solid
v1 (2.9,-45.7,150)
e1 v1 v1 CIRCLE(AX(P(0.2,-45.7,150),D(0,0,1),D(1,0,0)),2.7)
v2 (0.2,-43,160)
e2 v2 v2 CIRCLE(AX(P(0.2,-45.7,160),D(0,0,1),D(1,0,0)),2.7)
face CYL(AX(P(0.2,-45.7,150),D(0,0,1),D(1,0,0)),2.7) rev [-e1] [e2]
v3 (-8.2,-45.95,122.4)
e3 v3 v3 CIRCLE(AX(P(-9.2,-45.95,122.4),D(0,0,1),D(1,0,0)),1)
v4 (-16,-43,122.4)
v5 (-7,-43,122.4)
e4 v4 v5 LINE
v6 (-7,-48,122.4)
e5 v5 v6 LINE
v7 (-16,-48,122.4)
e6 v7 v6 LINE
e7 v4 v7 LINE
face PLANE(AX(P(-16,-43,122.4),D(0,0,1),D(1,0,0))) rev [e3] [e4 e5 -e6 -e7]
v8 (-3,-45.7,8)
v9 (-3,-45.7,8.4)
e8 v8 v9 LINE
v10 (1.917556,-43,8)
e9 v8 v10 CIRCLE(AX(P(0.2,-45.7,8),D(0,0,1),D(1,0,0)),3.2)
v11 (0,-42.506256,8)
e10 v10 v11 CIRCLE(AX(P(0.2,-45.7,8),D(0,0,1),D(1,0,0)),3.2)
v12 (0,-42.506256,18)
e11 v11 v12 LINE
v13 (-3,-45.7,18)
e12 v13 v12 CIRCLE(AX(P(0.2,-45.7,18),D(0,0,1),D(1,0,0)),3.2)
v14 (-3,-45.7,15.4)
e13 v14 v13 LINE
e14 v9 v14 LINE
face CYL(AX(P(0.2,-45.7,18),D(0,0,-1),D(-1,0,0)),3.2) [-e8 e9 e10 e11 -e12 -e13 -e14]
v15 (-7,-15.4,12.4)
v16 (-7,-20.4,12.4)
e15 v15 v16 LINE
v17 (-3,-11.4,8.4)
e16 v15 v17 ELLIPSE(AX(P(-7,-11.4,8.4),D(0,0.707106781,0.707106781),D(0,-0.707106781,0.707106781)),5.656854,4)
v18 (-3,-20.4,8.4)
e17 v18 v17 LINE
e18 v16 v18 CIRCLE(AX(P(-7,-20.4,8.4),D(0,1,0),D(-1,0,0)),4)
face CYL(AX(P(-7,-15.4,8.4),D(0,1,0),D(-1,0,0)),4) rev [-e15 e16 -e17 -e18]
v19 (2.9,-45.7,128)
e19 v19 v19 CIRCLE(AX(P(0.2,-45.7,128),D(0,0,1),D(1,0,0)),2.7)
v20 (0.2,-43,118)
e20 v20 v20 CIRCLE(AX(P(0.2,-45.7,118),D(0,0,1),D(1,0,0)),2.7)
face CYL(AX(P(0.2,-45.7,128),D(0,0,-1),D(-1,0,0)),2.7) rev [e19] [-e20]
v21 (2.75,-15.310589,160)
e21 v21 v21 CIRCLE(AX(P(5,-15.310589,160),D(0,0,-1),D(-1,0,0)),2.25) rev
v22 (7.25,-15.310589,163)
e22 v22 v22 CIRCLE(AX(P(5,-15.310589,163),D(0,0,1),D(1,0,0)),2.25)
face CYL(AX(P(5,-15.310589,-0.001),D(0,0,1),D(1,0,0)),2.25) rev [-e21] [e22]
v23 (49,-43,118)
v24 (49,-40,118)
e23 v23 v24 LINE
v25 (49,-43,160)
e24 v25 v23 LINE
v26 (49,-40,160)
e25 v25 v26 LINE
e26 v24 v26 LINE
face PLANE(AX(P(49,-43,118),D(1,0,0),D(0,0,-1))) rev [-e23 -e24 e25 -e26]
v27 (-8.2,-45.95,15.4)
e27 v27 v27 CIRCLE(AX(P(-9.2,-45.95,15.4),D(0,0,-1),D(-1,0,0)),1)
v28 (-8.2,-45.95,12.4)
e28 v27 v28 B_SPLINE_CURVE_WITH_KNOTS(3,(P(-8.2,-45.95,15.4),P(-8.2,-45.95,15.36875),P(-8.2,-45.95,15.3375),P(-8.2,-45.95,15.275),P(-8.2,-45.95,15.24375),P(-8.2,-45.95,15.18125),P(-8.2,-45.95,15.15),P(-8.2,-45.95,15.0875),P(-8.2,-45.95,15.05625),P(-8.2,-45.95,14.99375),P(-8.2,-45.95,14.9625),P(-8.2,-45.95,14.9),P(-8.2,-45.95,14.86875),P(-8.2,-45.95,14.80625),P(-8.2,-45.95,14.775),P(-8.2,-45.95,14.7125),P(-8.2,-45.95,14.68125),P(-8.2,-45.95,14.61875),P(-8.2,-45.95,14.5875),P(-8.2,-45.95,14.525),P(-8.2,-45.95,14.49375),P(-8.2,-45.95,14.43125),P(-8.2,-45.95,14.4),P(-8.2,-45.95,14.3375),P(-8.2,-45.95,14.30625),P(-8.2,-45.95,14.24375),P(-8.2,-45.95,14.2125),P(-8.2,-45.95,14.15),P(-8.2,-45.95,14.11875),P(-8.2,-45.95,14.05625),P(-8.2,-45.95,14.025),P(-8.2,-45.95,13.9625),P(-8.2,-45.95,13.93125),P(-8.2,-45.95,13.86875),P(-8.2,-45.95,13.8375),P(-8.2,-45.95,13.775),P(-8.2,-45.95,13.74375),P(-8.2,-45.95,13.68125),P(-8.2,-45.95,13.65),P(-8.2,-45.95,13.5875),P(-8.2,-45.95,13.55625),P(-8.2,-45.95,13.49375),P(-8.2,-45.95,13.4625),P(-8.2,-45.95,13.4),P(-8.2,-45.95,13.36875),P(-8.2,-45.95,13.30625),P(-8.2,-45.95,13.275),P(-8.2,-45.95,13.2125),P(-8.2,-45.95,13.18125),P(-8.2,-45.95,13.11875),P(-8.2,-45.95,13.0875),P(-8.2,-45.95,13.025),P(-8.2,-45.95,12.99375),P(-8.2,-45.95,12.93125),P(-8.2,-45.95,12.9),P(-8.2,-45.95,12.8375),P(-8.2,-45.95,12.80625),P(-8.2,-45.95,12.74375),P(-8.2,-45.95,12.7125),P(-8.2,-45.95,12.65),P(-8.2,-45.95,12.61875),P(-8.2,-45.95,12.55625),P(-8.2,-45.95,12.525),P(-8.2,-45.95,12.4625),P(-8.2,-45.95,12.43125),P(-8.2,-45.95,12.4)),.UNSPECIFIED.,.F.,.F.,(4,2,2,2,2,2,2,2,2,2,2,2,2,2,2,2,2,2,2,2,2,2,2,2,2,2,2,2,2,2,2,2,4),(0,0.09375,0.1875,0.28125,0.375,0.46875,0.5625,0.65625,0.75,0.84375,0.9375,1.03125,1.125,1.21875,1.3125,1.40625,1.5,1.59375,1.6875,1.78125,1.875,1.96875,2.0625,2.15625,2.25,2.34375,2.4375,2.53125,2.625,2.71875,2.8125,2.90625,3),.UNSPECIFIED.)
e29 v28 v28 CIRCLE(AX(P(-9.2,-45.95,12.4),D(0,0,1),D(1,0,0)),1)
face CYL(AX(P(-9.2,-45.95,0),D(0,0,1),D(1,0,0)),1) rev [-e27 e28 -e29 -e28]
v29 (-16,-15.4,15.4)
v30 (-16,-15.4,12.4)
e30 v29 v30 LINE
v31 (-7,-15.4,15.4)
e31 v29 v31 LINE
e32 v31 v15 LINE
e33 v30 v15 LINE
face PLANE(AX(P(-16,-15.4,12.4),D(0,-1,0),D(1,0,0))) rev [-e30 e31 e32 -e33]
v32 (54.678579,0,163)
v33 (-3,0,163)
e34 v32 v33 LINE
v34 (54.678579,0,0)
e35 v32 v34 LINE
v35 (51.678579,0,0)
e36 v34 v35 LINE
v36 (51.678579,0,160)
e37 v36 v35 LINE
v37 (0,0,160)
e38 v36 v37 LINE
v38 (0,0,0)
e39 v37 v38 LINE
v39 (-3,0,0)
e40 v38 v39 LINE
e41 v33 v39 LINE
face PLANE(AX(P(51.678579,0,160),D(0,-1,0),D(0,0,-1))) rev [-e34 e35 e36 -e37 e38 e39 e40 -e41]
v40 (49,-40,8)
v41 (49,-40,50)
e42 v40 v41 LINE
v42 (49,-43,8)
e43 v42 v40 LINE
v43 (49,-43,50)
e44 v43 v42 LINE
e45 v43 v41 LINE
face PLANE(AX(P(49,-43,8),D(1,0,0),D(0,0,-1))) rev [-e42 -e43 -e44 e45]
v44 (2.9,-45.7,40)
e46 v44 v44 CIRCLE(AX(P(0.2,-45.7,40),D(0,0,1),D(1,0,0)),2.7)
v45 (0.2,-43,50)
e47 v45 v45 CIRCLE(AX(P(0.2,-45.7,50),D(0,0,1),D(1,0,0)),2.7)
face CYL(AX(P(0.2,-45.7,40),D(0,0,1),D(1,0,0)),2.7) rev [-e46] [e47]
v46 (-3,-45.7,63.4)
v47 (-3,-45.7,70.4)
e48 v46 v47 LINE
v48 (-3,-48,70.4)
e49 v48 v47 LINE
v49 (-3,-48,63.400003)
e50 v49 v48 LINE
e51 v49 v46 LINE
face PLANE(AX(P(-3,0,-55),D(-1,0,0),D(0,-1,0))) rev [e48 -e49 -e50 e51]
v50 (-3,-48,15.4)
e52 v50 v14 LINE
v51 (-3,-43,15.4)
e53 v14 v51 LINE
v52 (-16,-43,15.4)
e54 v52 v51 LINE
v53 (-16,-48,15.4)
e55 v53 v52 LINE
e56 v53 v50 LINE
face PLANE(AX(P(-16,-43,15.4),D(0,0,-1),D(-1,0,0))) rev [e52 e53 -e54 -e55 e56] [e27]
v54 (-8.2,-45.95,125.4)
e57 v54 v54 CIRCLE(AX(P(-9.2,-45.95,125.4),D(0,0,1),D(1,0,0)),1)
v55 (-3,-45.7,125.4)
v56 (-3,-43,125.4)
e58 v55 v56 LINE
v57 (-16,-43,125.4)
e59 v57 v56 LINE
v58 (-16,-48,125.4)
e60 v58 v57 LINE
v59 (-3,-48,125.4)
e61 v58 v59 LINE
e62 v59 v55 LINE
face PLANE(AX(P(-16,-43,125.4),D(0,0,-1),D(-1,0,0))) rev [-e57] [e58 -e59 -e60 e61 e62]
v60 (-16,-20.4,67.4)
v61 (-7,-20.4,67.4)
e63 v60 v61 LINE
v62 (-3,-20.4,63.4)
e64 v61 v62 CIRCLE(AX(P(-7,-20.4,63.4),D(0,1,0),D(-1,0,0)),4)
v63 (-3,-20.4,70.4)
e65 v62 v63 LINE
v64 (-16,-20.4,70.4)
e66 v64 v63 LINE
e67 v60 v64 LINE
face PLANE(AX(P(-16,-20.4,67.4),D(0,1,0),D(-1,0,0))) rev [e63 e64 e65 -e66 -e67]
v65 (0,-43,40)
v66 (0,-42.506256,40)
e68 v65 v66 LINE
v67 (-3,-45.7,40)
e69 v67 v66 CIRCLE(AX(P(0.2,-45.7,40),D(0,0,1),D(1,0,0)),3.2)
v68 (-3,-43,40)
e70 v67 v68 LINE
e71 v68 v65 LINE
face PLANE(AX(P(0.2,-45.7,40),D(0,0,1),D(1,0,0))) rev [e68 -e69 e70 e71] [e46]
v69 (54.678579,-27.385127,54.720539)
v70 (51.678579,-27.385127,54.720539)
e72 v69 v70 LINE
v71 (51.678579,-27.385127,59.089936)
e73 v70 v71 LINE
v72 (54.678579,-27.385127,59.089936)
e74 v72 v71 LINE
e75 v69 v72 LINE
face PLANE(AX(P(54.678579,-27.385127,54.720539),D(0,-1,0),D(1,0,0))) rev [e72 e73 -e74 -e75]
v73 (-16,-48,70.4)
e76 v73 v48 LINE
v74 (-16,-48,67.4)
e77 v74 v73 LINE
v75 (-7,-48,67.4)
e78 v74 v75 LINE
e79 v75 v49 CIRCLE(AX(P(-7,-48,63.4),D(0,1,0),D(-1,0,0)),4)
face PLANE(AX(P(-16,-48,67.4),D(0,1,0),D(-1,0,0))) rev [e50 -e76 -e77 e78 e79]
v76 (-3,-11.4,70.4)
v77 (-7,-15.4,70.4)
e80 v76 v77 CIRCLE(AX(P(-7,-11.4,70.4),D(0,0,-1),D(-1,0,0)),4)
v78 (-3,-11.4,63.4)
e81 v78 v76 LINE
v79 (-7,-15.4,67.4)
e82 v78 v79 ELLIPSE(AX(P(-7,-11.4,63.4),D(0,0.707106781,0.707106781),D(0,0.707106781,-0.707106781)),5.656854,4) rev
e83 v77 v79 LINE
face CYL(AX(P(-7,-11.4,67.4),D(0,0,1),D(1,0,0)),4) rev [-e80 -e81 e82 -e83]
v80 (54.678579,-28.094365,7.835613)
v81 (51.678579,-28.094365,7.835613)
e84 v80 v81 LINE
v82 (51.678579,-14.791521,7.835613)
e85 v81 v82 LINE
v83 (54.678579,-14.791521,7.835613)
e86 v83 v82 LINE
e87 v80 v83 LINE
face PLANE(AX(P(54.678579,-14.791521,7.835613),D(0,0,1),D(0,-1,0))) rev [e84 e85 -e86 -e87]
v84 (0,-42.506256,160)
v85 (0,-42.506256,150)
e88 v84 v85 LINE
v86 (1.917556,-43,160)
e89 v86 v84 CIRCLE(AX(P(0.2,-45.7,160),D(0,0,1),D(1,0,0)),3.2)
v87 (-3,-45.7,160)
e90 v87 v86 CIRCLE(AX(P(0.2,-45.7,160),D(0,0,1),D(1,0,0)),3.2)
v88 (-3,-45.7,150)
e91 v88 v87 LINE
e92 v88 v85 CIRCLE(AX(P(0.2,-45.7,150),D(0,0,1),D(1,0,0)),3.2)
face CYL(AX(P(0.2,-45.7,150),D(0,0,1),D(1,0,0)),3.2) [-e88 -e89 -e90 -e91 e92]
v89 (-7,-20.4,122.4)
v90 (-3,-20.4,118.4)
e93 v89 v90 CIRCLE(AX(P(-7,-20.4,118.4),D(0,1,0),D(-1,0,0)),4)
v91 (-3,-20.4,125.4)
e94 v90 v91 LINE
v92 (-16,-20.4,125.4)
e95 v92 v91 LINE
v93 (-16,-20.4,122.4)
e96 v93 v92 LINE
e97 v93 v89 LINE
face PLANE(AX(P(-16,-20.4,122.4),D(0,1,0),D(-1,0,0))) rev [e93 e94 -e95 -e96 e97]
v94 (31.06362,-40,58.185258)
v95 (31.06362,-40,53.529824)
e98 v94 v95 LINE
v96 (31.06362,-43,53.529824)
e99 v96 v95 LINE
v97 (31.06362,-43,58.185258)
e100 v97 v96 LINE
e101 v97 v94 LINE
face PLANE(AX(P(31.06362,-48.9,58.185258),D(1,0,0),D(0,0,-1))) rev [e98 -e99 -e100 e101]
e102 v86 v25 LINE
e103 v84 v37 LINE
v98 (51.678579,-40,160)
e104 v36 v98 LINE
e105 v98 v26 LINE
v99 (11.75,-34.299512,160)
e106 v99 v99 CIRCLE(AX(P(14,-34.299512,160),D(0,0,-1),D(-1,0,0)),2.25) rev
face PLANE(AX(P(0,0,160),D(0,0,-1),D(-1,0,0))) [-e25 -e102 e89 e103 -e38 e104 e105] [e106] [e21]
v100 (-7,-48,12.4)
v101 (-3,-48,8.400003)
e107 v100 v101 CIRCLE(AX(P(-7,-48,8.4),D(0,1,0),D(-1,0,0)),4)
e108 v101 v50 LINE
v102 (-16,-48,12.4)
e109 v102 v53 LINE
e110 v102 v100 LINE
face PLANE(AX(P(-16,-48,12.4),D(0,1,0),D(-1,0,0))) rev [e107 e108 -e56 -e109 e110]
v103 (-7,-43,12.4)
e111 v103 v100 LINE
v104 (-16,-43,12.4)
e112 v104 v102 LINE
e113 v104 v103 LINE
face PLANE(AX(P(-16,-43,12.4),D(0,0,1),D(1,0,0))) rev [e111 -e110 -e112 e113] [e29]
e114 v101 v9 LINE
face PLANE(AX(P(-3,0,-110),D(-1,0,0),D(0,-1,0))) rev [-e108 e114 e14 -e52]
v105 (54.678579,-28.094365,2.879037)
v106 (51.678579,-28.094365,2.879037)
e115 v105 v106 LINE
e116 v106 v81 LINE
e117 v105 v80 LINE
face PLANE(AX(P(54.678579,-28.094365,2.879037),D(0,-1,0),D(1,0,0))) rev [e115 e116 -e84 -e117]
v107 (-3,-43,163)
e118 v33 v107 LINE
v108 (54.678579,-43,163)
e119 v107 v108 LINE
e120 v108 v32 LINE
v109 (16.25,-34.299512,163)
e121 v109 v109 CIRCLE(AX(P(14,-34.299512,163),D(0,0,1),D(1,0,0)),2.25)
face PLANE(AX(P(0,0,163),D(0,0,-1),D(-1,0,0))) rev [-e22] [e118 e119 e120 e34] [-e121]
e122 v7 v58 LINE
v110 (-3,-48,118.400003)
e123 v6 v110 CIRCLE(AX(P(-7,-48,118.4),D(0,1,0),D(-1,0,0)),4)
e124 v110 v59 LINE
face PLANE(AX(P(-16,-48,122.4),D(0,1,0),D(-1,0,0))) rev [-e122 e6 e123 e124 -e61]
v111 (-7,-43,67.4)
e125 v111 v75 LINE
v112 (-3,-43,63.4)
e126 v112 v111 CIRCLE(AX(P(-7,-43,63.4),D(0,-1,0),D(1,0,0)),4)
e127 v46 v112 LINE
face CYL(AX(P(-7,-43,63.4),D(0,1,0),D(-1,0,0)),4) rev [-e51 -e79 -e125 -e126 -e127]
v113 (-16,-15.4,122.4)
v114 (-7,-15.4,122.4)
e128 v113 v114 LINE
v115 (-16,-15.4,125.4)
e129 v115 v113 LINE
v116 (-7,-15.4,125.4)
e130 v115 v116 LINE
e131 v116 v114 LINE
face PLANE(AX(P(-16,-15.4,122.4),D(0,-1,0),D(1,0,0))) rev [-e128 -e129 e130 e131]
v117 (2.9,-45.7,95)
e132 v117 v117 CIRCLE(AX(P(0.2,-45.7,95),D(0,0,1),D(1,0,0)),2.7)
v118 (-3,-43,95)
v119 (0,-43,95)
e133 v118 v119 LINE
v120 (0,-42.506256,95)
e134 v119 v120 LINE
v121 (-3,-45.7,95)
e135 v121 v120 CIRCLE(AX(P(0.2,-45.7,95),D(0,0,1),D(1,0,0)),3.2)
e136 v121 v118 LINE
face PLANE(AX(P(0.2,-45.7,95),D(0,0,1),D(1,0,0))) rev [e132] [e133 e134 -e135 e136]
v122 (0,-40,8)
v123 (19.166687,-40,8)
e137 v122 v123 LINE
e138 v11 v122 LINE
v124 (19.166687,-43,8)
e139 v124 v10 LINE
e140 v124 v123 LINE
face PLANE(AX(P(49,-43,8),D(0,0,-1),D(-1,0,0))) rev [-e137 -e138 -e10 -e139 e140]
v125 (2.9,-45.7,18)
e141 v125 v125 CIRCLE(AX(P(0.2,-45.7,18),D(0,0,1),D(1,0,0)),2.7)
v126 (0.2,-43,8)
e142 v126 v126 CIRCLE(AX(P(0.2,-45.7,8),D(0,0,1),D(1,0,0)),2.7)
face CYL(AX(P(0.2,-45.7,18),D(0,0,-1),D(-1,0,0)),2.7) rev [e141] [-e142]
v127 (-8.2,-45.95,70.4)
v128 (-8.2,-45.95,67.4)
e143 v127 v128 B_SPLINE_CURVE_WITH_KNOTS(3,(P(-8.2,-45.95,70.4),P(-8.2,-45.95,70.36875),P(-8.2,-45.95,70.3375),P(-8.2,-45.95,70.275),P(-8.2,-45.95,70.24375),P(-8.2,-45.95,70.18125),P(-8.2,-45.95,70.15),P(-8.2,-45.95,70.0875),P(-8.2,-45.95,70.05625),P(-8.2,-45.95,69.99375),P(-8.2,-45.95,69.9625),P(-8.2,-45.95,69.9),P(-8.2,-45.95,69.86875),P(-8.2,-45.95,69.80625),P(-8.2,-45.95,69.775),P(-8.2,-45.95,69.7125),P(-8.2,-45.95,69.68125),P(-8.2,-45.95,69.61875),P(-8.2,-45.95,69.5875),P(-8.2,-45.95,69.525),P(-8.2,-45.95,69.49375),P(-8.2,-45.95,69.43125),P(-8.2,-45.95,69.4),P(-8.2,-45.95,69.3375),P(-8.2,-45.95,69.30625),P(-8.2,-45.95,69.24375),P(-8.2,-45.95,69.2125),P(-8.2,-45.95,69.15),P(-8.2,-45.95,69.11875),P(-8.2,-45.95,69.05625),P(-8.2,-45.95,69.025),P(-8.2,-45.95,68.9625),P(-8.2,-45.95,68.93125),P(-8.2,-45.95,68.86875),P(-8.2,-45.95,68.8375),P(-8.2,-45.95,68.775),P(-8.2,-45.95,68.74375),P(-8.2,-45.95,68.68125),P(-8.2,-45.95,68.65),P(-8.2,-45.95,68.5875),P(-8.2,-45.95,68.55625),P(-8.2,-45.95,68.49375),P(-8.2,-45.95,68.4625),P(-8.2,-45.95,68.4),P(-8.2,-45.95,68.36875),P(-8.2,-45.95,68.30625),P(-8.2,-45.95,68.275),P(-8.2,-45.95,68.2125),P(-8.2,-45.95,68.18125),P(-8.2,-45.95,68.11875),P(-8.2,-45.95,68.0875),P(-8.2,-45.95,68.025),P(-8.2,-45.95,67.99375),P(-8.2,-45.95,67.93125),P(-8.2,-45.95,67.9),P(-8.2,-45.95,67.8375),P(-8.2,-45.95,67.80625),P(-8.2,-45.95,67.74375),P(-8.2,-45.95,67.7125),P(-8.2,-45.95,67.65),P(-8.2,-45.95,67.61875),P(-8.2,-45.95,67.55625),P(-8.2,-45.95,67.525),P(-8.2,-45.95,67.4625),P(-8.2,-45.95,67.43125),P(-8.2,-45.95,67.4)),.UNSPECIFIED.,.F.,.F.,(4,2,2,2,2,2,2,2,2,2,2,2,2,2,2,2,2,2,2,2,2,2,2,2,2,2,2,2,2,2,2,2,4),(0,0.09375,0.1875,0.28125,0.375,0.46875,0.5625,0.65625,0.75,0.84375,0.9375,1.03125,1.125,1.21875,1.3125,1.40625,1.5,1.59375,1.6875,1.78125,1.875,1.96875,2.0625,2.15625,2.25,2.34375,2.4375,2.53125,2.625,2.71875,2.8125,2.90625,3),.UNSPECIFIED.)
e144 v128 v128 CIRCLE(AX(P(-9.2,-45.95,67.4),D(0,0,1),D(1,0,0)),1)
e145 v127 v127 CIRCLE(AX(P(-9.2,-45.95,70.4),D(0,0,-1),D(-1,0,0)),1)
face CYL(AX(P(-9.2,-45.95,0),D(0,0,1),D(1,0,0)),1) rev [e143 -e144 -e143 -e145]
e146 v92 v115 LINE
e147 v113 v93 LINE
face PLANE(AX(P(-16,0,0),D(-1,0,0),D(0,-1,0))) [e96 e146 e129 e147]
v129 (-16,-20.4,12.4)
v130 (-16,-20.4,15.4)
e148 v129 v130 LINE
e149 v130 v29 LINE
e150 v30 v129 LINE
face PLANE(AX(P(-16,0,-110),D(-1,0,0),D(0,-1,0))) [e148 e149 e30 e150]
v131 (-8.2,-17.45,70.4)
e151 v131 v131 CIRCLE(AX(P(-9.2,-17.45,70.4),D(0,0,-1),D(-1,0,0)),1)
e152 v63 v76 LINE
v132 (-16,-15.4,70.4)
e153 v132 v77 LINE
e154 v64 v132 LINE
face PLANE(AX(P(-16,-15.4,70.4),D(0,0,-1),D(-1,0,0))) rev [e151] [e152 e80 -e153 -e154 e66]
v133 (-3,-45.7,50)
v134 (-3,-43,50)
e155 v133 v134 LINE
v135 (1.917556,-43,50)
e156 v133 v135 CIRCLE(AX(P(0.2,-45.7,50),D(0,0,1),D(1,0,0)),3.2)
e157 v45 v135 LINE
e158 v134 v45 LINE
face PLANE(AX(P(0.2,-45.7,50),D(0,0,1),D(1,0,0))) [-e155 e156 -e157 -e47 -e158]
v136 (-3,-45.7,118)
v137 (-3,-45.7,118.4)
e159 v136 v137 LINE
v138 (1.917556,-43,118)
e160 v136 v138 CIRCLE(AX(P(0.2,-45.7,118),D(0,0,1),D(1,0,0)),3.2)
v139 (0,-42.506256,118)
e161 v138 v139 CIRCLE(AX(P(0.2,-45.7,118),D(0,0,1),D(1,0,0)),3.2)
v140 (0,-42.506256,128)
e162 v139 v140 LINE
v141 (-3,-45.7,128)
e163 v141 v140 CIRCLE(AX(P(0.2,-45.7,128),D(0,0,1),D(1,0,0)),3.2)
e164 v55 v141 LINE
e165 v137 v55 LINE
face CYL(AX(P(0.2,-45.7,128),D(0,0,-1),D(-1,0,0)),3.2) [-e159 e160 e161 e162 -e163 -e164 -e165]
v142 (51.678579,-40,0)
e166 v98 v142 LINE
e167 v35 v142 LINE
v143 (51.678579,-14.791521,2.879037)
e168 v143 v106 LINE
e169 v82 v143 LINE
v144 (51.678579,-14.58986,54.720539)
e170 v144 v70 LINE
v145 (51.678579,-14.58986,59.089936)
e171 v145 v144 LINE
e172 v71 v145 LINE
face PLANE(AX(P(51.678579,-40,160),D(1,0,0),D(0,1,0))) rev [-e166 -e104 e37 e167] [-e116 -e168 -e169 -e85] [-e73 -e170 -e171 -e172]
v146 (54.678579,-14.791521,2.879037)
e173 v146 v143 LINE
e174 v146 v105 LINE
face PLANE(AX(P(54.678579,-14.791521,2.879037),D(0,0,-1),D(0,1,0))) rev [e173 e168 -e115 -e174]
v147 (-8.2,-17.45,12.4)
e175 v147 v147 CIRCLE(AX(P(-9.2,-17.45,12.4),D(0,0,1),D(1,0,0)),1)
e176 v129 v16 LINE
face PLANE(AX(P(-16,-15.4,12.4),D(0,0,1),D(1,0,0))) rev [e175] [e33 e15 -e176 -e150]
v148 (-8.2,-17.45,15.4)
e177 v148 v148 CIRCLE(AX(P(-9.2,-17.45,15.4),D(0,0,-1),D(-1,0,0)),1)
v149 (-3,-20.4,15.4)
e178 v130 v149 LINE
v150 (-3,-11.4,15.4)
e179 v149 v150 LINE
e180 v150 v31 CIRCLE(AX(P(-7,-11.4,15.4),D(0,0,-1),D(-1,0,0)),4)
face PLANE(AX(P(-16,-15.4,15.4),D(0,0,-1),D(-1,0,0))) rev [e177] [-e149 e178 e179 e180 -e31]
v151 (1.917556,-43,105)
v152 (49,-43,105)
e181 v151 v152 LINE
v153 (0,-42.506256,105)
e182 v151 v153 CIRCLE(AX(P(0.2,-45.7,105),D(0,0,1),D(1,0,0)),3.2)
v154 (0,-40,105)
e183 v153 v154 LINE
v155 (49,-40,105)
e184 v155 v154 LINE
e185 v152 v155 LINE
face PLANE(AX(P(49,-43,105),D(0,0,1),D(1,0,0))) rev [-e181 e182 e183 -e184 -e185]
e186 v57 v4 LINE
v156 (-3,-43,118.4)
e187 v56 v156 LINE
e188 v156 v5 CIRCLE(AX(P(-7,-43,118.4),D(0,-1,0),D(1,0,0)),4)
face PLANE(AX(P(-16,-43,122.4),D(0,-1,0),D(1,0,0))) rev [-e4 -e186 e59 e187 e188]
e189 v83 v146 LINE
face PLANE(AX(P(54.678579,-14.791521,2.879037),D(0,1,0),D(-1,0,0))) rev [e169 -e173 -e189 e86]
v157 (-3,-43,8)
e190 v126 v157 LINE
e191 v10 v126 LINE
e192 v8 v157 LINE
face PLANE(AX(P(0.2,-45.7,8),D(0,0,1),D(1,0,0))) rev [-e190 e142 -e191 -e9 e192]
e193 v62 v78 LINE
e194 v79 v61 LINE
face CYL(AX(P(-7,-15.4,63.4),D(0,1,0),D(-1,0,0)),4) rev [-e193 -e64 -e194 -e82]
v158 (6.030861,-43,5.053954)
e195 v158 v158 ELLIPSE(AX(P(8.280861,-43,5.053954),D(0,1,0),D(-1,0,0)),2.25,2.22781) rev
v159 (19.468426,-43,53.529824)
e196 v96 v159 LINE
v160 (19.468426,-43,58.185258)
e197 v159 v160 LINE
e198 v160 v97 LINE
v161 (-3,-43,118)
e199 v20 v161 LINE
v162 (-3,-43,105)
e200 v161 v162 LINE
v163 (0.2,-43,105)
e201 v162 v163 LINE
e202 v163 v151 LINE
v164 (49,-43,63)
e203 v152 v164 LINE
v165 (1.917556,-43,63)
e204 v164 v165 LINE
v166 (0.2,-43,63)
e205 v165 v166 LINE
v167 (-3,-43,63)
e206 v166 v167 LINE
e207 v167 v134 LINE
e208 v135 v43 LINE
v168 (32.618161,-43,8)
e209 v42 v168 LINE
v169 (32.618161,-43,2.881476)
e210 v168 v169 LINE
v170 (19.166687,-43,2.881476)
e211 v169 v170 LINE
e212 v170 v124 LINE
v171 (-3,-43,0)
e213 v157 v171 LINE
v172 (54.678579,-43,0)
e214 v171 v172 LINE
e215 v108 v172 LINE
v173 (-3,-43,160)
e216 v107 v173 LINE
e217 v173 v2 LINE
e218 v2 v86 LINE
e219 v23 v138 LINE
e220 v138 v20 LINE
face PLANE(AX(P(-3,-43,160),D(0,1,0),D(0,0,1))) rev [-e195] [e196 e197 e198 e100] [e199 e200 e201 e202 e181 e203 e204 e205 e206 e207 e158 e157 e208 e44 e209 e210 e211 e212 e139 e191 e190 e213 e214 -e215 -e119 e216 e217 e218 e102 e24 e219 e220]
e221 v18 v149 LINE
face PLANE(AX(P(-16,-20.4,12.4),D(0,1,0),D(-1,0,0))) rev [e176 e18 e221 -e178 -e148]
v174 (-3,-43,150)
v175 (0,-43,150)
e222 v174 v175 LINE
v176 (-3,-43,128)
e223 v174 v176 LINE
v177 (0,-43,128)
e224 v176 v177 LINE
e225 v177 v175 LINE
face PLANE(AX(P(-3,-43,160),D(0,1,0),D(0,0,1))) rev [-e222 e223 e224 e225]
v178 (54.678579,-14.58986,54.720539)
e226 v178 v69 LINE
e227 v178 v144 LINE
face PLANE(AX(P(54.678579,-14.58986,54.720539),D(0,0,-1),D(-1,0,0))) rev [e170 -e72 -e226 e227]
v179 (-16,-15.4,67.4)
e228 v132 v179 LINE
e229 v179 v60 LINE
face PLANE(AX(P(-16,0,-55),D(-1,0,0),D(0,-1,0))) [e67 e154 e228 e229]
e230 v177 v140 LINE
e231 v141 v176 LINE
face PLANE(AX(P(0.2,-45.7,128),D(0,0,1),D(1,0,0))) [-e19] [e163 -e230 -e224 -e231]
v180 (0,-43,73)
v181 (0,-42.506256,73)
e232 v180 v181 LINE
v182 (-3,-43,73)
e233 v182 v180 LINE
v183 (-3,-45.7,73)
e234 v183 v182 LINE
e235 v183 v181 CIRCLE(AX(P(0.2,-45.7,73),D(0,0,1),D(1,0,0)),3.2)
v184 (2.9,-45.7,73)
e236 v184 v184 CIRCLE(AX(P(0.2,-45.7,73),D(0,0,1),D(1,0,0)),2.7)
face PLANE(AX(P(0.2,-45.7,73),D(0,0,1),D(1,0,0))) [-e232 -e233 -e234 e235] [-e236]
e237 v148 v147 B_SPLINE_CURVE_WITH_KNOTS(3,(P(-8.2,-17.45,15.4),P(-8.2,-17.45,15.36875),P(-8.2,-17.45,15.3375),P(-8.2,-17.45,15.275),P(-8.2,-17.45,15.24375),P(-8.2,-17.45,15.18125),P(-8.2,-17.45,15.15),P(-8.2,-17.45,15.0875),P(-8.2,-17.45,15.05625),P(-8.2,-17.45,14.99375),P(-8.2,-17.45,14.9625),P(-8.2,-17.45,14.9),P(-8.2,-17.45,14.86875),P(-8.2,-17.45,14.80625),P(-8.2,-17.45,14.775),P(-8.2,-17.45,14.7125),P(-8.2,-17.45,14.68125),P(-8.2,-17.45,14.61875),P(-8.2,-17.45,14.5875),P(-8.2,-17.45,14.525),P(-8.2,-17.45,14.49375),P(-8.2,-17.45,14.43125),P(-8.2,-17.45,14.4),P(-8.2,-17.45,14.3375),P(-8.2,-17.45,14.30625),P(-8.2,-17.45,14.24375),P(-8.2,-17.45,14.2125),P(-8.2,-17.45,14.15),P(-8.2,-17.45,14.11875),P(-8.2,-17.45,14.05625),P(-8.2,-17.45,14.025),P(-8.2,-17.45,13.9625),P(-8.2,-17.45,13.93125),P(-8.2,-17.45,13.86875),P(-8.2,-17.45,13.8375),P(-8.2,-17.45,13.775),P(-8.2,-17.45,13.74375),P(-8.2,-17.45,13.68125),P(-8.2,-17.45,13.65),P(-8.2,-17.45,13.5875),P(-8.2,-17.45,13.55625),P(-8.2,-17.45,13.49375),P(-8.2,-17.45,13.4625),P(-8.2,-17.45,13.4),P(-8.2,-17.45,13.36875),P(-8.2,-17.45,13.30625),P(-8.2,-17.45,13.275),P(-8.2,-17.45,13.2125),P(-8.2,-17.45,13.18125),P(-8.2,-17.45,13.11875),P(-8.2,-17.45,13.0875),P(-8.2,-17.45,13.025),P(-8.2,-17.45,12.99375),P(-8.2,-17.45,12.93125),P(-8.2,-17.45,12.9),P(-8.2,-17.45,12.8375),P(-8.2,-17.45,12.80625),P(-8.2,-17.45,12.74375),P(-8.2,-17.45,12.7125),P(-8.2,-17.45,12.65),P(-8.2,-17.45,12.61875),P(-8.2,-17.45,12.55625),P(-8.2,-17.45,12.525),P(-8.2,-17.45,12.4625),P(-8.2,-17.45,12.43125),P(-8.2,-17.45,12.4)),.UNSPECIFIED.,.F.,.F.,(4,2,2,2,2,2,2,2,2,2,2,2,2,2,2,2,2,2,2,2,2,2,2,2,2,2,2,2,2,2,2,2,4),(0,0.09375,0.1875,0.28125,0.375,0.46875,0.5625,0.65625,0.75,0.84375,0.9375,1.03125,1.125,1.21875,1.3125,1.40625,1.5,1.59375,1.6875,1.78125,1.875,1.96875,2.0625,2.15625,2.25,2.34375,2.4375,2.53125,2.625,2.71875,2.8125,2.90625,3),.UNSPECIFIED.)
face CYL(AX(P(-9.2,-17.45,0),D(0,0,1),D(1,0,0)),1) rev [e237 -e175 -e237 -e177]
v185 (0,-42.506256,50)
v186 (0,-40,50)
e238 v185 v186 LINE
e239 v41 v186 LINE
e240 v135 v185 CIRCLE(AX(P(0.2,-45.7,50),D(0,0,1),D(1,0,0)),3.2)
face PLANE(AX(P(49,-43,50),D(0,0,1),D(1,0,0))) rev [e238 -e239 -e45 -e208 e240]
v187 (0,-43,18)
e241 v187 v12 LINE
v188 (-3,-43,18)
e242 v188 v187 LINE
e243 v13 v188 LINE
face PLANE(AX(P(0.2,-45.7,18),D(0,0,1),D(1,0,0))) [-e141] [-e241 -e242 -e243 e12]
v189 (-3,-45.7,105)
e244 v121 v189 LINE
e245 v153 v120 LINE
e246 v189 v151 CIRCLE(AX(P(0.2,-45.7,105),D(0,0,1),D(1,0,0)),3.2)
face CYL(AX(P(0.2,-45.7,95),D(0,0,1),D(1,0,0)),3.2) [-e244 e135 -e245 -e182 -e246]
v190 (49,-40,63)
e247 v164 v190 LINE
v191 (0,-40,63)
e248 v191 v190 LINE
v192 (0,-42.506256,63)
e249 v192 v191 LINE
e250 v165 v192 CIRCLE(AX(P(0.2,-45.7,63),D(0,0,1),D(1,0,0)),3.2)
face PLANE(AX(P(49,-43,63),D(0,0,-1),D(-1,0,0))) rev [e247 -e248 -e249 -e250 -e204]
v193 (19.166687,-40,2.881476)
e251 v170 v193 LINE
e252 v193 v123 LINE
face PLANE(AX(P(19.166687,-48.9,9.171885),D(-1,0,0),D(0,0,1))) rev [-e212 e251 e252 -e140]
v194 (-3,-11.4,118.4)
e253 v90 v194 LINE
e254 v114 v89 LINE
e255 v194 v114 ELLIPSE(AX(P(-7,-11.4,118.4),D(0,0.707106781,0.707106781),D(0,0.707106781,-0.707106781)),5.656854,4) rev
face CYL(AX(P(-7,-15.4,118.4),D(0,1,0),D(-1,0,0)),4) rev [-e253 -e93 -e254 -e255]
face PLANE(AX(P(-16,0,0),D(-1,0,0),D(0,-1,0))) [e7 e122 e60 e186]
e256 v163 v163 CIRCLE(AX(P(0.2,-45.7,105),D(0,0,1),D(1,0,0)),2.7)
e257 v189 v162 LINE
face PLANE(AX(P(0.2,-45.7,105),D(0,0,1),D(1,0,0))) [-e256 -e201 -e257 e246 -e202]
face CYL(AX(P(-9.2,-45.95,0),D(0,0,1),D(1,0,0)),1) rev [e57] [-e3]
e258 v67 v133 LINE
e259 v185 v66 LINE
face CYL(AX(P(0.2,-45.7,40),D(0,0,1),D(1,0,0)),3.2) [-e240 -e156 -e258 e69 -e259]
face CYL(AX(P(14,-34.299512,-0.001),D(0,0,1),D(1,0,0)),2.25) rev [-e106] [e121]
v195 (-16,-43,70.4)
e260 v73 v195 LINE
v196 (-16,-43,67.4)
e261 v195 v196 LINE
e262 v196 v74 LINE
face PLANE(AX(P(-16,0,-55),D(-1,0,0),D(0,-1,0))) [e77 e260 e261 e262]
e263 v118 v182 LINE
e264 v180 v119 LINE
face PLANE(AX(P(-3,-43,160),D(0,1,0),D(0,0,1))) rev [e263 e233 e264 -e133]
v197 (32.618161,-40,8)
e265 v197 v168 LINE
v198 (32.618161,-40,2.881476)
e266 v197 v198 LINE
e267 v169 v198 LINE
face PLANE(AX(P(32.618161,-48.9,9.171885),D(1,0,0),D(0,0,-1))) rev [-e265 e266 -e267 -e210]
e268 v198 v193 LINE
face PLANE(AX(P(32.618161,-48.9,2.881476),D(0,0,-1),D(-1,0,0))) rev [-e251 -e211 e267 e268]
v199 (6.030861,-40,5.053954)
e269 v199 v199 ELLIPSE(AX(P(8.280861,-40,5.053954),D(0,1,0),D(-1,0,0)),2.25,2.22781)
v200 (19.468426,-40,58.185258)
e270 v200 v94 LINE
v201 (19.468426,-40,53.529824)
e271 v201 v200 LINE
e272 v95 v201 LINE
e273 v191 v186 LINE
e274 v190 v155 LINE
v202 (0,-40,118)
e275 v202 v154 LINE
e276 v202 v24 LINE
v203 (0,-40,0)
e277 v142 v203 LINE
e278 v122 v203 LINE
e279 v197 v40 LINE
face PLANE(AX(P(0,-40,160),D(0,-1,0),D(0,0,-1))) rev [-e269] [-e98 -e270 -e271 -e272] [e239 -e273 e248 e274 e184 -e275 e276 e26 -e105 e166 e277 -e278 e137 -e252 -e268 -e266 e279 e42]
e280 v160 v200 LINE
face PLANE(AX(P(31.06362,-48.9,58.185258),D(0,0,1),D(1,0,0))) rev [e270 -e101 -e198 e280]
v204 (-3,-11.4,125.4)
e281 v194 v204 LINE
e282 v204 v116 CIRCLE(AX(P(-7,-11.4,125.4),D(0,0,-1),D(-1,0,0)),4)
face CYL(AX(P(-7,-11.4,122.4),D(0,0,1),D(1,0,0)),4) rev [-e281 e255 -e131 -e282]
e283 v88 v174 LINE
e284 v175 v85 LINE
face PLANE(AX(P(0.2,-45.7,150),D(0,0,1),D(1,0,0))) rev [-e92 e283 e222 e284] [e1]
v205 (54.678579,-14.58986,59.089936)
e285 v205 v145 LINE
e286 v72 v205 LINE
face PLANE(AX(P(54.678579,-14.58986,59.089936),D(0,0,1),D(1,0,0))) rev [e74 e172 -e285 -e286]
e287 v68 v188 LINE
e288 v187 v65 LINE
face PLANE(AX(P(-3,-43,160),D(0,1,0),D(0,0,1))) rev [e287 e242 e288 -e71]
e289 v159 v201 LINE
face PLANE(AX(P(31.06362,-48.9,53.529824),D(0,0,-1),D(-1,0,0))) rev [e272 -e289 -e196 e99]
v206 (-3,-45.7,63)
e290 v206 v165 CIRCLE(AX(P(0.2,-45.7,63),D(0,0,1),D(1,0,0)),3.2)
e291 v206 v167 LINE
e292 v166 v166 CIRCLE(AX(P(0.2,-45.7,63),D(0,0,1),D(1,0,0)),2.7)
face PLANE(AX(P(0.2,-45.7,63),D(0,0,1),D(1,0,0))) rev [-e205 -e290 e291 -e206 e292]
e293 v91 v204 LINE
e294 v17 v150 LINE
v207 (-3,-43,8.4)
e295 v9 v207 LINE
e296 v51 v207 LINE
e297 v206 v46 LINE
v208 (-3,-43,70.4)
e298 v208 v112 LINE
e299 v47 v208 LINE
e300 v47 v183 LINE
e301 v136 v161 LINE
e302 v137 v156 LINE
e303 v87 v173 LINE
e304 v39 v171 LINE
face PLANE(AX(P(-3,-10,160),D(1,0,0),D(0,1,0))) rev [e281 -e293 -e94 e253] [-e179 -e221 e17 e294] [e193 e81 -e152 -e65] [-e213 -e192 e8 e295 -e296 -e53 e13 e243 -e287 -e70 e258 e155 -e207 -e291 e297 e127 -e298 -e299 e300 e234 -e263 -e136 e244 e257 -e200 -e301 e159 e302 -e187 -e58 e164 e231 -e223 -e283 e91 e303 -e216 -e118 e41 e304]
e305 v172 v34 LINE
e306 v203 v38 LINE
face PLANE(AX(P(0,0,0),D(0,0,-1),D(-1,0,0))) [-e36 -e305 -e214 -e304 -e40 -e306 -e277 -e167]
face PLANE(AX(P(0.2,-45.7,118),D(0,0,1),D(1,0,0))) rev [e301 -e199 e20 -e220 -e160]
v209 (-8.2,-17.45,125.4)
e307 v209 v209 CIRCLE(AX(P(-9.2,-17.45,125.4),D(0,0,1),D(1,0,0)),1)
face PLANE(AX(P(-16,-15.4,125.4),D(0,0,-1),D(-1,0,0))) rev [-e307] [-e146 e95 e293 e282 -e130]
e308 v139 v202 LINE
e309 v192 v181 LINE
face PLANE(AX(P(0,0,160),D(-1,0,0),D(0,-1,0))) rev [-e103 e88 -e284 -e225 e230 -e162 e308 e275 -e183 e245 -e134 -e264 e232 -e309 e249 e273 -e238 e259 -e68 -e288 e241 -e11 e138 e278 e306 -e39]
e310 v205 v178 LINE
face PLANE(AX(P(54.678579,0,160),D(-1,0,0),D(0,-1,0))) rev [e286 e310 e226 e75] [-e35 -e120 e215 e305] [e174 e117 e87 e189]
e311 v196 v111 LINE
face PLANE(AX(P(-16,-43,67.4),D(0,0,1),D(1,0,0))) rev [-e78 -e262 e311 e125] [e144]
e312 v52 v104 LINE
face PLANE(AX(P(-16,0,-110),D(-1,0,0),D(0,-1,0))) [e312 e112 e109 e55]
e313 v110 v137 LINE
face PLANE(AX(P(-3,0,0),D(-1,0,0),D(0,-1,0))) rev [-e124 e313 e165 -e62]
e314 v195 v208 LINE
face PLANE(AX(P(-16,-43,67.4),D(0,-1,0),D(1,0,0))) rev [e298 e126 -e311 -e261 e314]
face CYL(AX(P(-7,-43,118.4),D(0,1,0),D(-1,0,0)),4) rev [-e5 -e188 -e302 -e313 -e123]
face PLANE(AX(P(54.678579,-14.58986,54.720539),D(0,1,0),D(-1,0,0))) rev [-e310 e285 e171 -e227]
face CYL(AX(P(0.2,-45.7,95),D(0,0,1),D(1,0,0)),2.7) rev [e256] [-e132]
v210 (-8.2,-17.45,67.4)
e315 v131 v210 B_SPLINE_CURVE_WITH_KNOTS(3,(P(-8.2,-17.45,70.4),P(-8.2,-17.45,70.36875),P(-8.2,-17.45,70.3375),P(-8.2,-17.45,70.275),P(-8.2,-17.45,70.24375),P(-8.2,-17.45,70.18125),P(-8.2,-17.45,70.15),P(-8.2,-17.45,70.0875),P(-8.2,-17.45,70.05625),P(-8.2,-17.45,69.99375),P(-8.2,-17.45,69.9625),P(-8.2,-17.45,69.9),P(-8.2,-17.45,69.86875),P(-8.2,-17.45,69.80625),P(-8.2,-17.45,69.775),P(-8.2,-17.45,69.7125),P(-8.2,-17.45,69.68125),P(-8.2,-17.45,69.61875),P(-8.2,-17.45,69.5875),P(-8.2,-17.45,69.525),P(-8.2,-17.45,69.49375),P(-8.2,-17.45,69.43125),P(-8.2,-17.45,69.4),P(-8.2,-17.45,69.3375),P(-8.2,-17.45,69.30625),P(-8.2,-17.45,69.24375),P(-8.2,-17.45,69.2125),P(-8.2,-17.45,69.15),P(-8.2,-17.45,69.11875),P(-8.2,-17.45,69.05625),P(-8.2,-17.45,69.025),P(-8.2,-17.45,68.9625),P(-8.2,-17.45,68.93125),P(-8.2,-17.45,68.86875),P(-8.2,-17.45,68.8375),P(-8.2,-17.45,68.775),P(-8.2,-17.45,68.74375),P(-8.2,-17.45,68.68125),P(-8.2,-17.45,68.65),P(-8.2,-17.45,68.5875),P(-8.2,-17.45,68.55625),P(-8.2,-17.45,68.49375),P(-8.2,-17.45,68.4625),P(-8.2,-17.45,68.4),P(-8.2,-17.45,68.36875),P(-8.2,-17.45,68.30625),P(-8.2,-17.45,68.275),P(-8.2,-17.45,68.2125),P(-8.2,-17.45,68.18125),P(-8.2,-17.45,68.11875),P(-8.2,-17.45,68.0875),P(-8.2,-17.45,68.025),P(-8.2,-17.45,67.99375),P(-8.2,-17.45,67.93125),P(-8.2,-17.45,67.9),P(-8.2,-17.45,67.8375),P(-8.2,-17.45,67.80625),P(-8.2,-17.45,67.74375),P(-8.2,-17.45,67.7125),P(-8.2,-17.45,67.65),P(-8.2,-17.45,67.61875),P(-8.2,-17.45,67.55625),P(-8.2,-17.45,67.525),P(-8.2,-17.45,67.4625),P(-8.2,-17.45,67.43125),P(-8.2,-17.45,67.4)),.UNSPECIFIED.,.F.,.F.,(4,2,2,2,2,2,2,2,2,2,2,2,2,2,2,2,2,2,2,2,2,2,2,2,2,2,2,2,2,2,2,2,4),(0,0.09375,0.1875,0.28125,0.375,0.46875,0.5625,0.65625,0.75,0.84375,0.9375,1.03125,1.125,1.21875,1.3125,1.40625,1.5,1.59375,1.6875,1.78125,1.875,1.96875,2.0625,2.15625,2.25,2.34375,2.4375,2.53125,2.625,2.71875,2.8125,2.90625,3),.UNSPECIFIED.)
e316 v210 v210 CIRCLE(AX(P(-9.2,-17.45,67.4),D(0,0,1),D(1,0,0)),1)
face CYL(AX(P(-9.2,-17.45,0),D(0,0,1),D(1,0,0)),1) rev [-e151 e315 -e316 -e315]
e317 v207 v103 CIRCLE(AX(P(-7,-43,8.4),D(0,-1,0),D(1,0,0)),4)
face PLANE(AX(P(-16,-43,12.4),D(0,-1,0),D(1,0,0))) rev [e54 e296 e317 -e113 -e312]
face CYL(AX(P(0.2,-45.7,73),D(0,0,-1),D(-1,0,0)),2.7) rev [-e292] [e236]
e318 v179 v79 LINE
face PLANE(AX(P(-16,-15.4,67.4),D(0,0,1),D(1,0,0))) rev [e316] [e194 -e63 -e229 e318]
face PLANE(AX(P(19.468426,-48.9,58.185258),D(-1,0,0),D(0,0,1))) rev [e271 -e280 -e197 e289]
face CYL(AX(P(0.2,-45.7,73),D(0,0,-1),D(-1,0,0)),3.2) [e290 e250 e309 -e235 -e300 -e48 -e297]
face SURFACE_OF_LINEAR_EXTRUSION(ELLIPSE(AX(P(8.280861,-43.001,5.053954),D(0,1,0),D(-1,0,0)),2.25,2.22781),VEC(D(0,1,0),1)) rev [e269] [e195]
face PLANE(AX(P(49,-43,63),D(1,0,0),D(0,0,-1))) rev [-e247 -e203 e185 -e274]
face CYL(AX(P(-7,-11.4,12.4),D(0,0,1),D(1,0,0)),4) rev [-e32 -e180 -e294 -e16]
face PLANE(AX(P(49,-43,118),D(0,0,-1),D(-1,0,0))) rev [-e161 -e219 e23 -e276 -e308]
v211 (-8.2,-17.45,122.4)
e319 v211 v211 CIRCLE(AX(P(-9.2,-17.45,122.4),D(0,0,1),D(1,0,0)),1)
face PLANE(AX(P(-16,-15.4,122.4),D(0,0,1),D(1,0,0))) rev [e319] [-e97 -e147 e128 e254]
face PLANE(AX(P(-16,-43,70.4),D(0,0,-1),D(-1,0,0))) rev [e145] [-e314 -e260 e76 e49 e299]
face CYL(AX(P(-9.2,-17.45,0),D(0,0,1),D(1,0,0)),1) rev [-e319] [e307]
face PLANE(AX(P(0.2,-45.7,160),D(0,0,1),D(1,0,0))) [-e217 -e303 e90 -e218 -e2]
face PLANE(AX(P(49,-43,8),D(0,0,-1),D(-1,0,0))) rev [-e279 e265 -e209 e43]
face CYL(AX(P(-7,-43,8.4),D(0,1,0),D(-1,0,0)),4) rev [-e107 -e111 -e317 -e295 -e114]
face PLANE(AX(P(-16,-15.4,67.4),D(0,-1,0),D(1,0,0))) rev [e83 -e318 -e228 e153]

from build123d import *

# Parameters (mm, degrees)
BOSS_EXTRUDE1_DEPTH = 160
SKETCH2_W           = 49
SKETCH2_H           = 42
CUT_EXTRUDE1_DEPTH  = 175.467036895
BOSS_EXTRUDE2_DEPTH = 3
CUT_EXTRUDE2_REACH  = 179.222
SKETCH4_R           = 2.25
CUT_EXTRUDE3_REACH  = 178.518
SKETCH5_RX          = 2.25
SKETCH5_RY          = 2.22780983
SKETCH6_R           = 3.2
SKETCH6_R_2         = 2.7
BOSS_EXTRUDE3_DEPTH = 10
LPATTERN1_COUNT     = 3
LPATTERN1_PITCH     = 55
BOSS_EXTRUDE5_START = 10
SKETCH8_R           = 3.2
SKETCH8_R_2         = 2.7
BOSS_EXTRUDE5_DEPTH = 10
LPATTERN4_COUNT     = 3
LPATTERN4_PITCH     = 55
BOSS_EXTRUDE6_REACH = 179.222
SKETCH9_W           = 1.482443596
SKETCH9_H           = 10
SKETCH10_W          = 3
SKETCH10_H          = 5
BOSS_EXTRUDE7_DEPTH = 13
LPATTERN5_COUNT     = 3
LPATTERN5_PITCH     = 55
SKETCH11_R          = 1
CUT_EXTRUDE4_DEPTH  = 146.279444516
FILLET1_R           = 4
SKETCH12_W          = 13.45147454
SKETCH12_H          = 6.29040958
SKETCH12_W_2        = 11.5951942
SKETCH12_H_2        = 4.655434548
CUT_EXTRUDE5_DEPTH  = 177.518404158
SKETCH13_W          = 4.956575853
SKETCH13_H          = 13.302843662
SKETCH13_W_2        = 4.369397502
SKETCH13_H_2        = 12.795266669
SKETCH13_W_3        = 6.136964941
SKETCH13_H_3        = 15.145551293
CUT_EXTRUDE8_DEPTH  = 184.140929451


with BuildPart() as part:
    # Sketch1 → Boss-Extrude1 (new body)
    with BuildSketch(Plane.XY):
        Polygon((0, 0), (0, -10), (0, -40), (51.678578647, -40), (51.678578647, 0), (54.678578647, 0), (54.678578647, -43), (-3, -43), (-3, -10), (-3, 0), align=None)
    extrude(amount=BOSS_EXTRUDE1_DEPTH)

    # Sketch2 → Cut-Extrude1 (cut, through all)
    with BuildSketch(Plane(origin=(0, 0, 0), x_dir=(1, 0, 0), z_dir=(0, 1, 0))):
        with Locations((24.5, -29)):
            Rectangle(SKETCH2_W, SKETCH2_H)
        with Locations((24.5, -84)):
            Rectangle(SKETCH2_W, SKETCH2_H)
        with Locations((24.5, -139)):
            Rectangle(SKETCH2_W, SKETCH2_H)
    extrude(amount=-CUT_EXTRUDE1_DEPTH, mode=Mode.SUBTRACT)

    # Sketch3 → Boss-Extrude2 (add)
    with BuildSketch(Plane.XY.offset(160)):
        Polygon((-3, 0), (54.678578647, 0), (54.678578647, -43), (0, -43), (-3, -43), align=None)
    extrude(amount=BOSS_EXTRUDE2_DEPTH)

    # Sketch4 → Cut-Extrude2 (cut, up to next)
    with BuildSketch(Plane.XY.offset(163), mode=Mode.PRIVATE) as cut_extrude2_sk1:
        with Locations((14, -34.29951212)):
            Circle(SKETCH4_R)
    cut_extrude2_tool1 = extrude(cut_extrude2_sk1.sketch, amount=-CUT_EXTRUDE2_REACH, mode=Mode.PRIVATE) & part.part
    # Sketch4 → Cut-Extrude2 (cut, up to next)
    with BuildSketch(Plane.XY.offset(163), mode=Mode.PRIVATE) as cut_extrude2_sk2:
        with Locations((5, -15.310588783)):
            Circle(SKETCH4_R)
    cut_extrude2_tool2 = extrude(cut_extrude2_sk2.sketch, amount=-CUT_EXTRUDE2_REACH, mode=Mode.PRIVATE) & part.part
    add(cut_extrude2_tool1.solids().sort_by_distance((14, -34.299512, 163))[0], mode=Mode.SUBTRACT)
    add(cut_extrude2_tool2.solids().sort_by_distance((5, -15.310589, 163))[0], mode=Mode.SUBTRACT)

    # Sketch5 → Cut-Extrude3 (cut, up to next)
    with BuildSketch(Plane(origin=(0, -40, 0), x_dir=(1, 0, 0), z_dir=(0, 1, 0)), mode=Mode.PRIVATE) as cut_extrude3_sk1:
        with Locations(Location((8.280861004, -5.05395422), (0, 0, 180))):
            Ellipse(SKETCH5_RX, SKETCH5_RY)
    cut_extrude3_tool1 = extrude(cut_extrude3_sk1.sketch, amount=-CUT_EXTRUDE3_REACH, mode=Mode.PRIVATE) & part.part
    add(cut_extrude3_tool1.solids().sort_by_distance((8.280861, -40, 5.053954))[0], mode=Mode.SUBTRACT)

    # Sketch6 → Boss-Extrude3 (add)
    with BuildSketch(Plane.XY.offset(160)):
        with Locations((0.2, -45.7)):
            Circle(SKETCH6_R)
        with Locations((0.2, -45.7)):
            Circle(SKETCH6_R_2, mode=Mode.SUBTRACT)
    boss_extrude3 = extrude(amount=-BOSS_EXTRUDE3_DEPTH)

    # LPattern1: Boss-Extrude3 ×3
    with Locations(*[(0, 0, -i * LPATTERN1_PITCH) for i in range(1, LPATTERN1_COUNT)]):
        add(boss_extrude3)

    # Sketch8 → Boss-Extrude5 (add)
    with BuildSketch(Plane.XY.offset(118).offset(BOSS_EXTRUDE5_START)):
        with Locations((0.2, -45.7)):
            Circle(SKETCH8_R)
        with Locations((0.2, -45.7)):
            Circle(SKETCH8_R_2, mode=Mode.SUBTRACT)
    boss_extrude5 = extrude(amount=-BOSS_EXTRUDE5_DEPTH)

    # LPattern4: Boss-Extrude5 ×3
    with Locations(*[(0, 0, -i * LPATTERN4_PITCH) for i in range(1, LPATTERN4_COUNT)]):
        add(boss_extrude5)

    # Sketch9 → Boss-Extrude6 (add, up to next)
    with BuildSketch(Plane.XZ.offset(43), mode=Mode.PRIVATE) as boss_extrude6_sk1:
        with Locations((-2.258778202, 155)):
            Rectangle(SKETCH9_W, SKETCH9_H)
    boss_extrude6_tool1 = extrude(boss_extrude6_sk1.sketch, amount=BOSS_EXTRUDE6_REACH, mode=Mode.PRIVATE) - part.part
    # Sketch9 → Boss-Extrude6 (add, up to next)
    with BuildSketch(Plane.XZ.offset(43), mode=Mode.PRIVATE) as boss_extrude6_sk2:
        with Locations((-2.258778202, 100)):
            Rectangle(SKETCH9_W, SKETCH9_H)
    boss_extrude6_tool2 = extrude(boss_extrude6_sk2.sketch, amount=BOSS_EXTRUDE6_REACH, mode=Mode.PRIVATE) - part.part
    # Sketch9 → Boss-Extrude6 (add, up to next)
    with BuildSketch(Plane.XZ.offset(43), mode=Mode.PRIVATE) as boss_extrude6_sk3:
        with Locations((-2.258778202, 123)):
            Rectangle(SKETCH9_W, SKETCH9_H)
    boss_extrude6_tool3 = extrude(boss_extrude6_sk3.sketch, amount=BOSS_EXTRUDE6_REACH, mode=Mode.PRIVATE) - part.part
    # Sketch9 → Boss-Extrude6 (add, up to next)
    with BuildSketch(Plane.XZ.offset(43), mode=Mode.PRIVATE) as boss_extrude6_sk4:
        with Locations((-2.258778202, 68)):
            Rectangle(SKETCH9_W, SKETCH9_H)
    boss_extrude6_tool4 = extrude(boss_extrude6_sk4.sketch, amount=BOSS_EXTRUDE6_REACH, mode=Mode.PRIVATE) - part.part
    # Sketch9 → Boss-Extrude6 (add, up to next)
    with BuildSketch(Plane.XZ.offset(43), mode=Mode.PRIVATE) as boss_extrude6_sk5:
        with Locations((-2.258778202, 45)):
            Rectangle(SKETCH9_W, SKETCH9_H)
    boss_extrude6_tool5 = extrude(boss_extrude6_sk5.sketch, amount=BOSS_EXTRUDE6_REACH, mode=Mode.PRIVATE) - part.part
    # Sketch9 → Boss-Extrude6 (add, up to next)
    with BuildSketch(Plane.XZ.offset(43), mode=Mode.PRIVATE) as boss_extrude6_sk6:
        with Locations((-2.258778202, 13)):
            Rectangle(SKETCH9_W, SKETCH9_H)
    boss_extrude6_tool6 = extrude(boss_extrude6_sk6.sketch, amount=BOSS_EXTRUDE6_REACH, mode=Mode.PRIVATE) - part.part
    add(boss_extrude6_tool1.solids().sort_by_distance((-2.258778, -43, 155))[0])
    add(boss_extrude6_tool2.solids().sort_by_distance((-2.258778, -43, 100))[0])
    add(boss_extrude6_tool3.solids().sort_by_distance((-2.258778, -43, 123))[0])
    add(boss_extrude6_tool4.solids().sort_by_distance((-2.258778, -43, 68))[0])
    add(boss_extrude6_tool5.solids().sort_by_distance((-2.258778, -43, 45))[0])
    add(boss_extrude6_tool6.solids().sort_by_distance((-2.258778, -43, 13))[0])

    # Sketch10 → Boss-Extrude7 (add)
    with BuildSketch(Plane.ZY.offset(3)):
        with Locations((123.9, -45.5)):
            Rectangle(SKETCH10_W, SKETCH10_H)
        with Locations((123.9, -17.9)):
            Rectangle(SKETCH10_W, SKETCH10_H)
    boss_extrude7 = extrude(amount=BOSS_EXTRUDE7_DEPTH)

    # LPattern5: Boss-Extrude7 ×3
    with Locations(*[(0, 0, -i * LPATTERN5_PITCH) for i in range(1, LPATTERN5_COUNT)]):
        add(boss_extrude7)

    # Sketch11 → Cut-Extrude4 (cut, through all)
    with BuildSketch(Plane.XY.offset(125.4)):
        with Locations((-9.2, -45.95)):
            Circle(SKETCH11_R)
        with Locations((-9.2, -17.45)):
            Circle(SKETCH11_R)
    extrude(amount=-CUT_EXTRUDE4_DEPTH, mode=Mode.SUBTRACT)

    # Fillet1
    # the kernel refuses this fillet: 4 mm, written as the material it adds along each edge
    with BuildSketch(Plane(origin=(-3, -15.4, 122.4), x_dir=(0, 1, 0), z_dir=(0, 0, 1)), Plane(origin=(-3, -15.4, 12.4), x_dir=(0, 1, 0), z_dir=(0, 0, 1)), Plane(origin=(-3, -15.4, 67.4), x_dir=(0, 1, 0), z_dir=(0, 0, 1))) as fillet1_piece_1:
        with BuildLine():
            CenterArc((FILLET1_R, FILLET1_R), FILLET1_R, 180, 90)
            Line((0, FILLET1_R), (0, 0))
            Line((0, 0), (FILLET1_R, 0))
        make_face()
    extrude(amount=3)
    with BuildSketch(Plane(origin=(-3, -20.4, 122.4), x_dir=(0, 0, -1), z_dir=(0, 1, 0)), Plane(origin=(-3, -20.4, 12.4), x_dir=(0, 0, -1), z_dir=(0, 1, 0)), Plane(origin=(-3, -20.4, 67.4), x_dir=(0, 0, -1), z_dir=(0, 1, 0))) as fillet1_piece_2:
        with BuildLine():
            CenterArc((FILLET1_R, FILLET1_R), FILLET1_R, 180, 90)
            Line((0, FILLET1_R), (0, 0))
            Line((0, 0), (FILLET1_R, 0))
        make_face()
    extrude(amount=5)
    with BuildSketch(Plane(origin=(-3, -55.7, 122.4), x_dir=(0, 0, -1), z_dir=(0, 1, 0))) as fillet1_piece_3_section:
        with BuildLine():
            CenterArc((FILLET1_R, FILLET1_R), FILLET1_R, 180, 90)
            Line((0, FILLET1_R), (0, 0))
            Line((0, 0), (FILLET1_R, 0))
        make_face()
    fillet1_piece_3 = extrude(amount=12.7, mode=Mode.PRIVATE)
    fillet1_piece_3 = split(fillet1_piece_3, bisect_by=Plane(origin=(-3, -45.5, 121.586107481), z_dir=(-1, 0, 0)), keep=Keep.TOP, mode=Mode.PRIVATE)
    fillet1_piece_3 = split(fillet1_piece_3, bisect_by=Plane(origin=(-3.987804201, -48, 121.586107481), z_dir=(0, 1, 0)), keep=Keep.TOP, mode=Mode.PRIVATE)
    add(fillet1_piece_3)
    with BuildSketch(Plane(origin=(-3, -55.7, 12.4), x_dir=(0, 0, -1), z_dir=(0, 1, 0))) as fillet1_piece_4_section:
        with BuildLine():
            CenterArc((FILLET1_R, FILLET1_R), FILLET1_R, 180, 90)
            Line((0, FILLET1_R), (0, 0))
            Line((0, 0), (FILLET1_R, 0))
        make_face()
    fillet1_piece_4 = extrude(amount=12.7, mode=Mode.PRIVATE)
    fillet1_piece_4 = split(fillet1_piece_4, bisect_by=Plane(origin=(-3, -45.5, 11.586107481), z_dir=(-1, 0, 0)), keep=Keep.TOP, mode=Mode.PRIVATE)
    fillet1_piece_4 = split(fillet1_piece_4, bisect_by=Plane(origin=(-3.987804201, -48, 11.586107481), z_dir=(0, 1, 0)), keep=Keep.TOP, mode=Mode.PRIVATE)
    add(fillet1_piece_4)
    with BuildSketch(Plane(origin=(-3, -55.7, 67.4), x_dir=(0, 0, -1), z_dir=(0, 1, 0))) as fillet1_piece_5_section:
        with BuildLine():
            CenterArc((FILLET1_R, FILLET1_R), FILLET1_R, 180, 90)
            Line((0, FILLET1_R), (0, 0))
            Line((0, 0), (FILLET1_R, 0))
        make_face()
    fillet1_piece_5 = extrude(amount=12.7, mode=Mode.PRIVATE)
    fillet1_piece_5 = split(fillet1_piece_5, bisect_by=Plane(origin=(-3, -45.5, 66.586107481), z_dir=(-1, 0, 0)), keep=Keep.TOP, mode=Mode.PRIVATE)
    fillet1_piece_5 = split(fillet1_piece_5, bisect_by=Plane(origin=(-3.987804201, -48, 66.586107481), z_dir=(0, 1, 0)), keep=Keep.TOP, mode=Mode.PRIVATE)
    add(fillet1_piece_5)
    with BuildSketch(Plane(origin=(-3, -15.4, 112.4), x_dir=(0, 1, 0), z_dir=(0, 0, 1))) as fillet1_piece_6a_section:
        with BuildLine():
            CenterArc((FILLET1_R, FILLET1_R), FILLET1_R, 180, 90)
            Line((0, FILLET1_R), (0, 0))
            Line((0, 0), (FILLET1_R, 0))
        make_face()
    fillet1_piece_6a = extrude(amount=13, mode=Mode.PRIVATE)
    fillet1_piece_6a = split(fillet1_piece_6a, bisect_by=Plane(origin=(-3.905580457, -14.494419543, 122.4), z_dir=(0, 0, -1)), keep=Keep.TOP, mode=Mode.PRIVATE)
    with BuildSketch(Plane(origin=(-3, -20.4, 122.4), x_dir=(0, 0, -1), z_dir=(0, 1, 0))) as fillet1_piece_6b_section:
        with BuildLine():
            CenterArc((FILLET1_R, FILLET1_R), FILLET1_R, 180, 90)
            Line((0, FILLET1_R), (0, 0))
            Line((0, 0), (FILLET1_R, 0))
        make_face()
    fillet1_piece_6b = extrude(amount=15, mode=Mode.PRIVATE)
    fillet1_piece_6b = split(fillet1_piece_6b, bisect_by=Plane(origin=(-3.905580457, -15.4, 121.494419543), z_dir=(0, 1, 0)), keep=Keep.TOP, mode=Mode.PRIVATE)
    fillet1_piece_6 = fillet1_piece_6a & fillet1_piece_6b
    add(fillet1_piece_6)
    with BuildSketch(Plane(origin=(-3, -15.4, 2.4), x_dir=(0, 1, 0), z_dir=(0, 0, 1))) as fillet1_piece_7a_section:
        with BuildLine():
            CenterArc((FILLET1_R, FILLET1_R), FILLET1_R, 180, 90)
            Line((0, FILLET1_R), (0, 0))
            Line((0, 0), (FILLET1_R, 0))
        make_face()
    fillet1_piece_7a = extrude(amount=13, mode=Mode.PRIVATE)
    fillet1_piece_7a = split(fillet1_piece_7a, bisect_by=Plane(origin=(-3.905580457, -14.494419543, 12.4), z_dir=(0, 0, -1)), keep=Keep.TOP, mode=Mode.PRIVATE)
    with BuildSketch(Plane(origin=(-3, -20.4, 12.4), x_dir=(0, 0, -1), z_dir=(0, 1, 0))) as fillet1_piece_7b_section:
        with BuildLine():
            CenterArc((FILLET1_R, FILLET1_R), FILLET1_R, 180, 90)
            Line((0, FILLET1_R), (0, 0))
            Line((0, 0), (FILLET1_R, 0))
        make_face()
    fillet1_piece_7b = extrude(amount=15, mode=Mode.PRIVATE)
    fillet1_piece_7b = split(fillet1_piece_7b, bisect_by=Plane(origin=(-3.905580457, -15.4, 11.494419543), z_dir=(0, 1, 0)), keep=Keep.TOP, mode=Mode.PRIVATE)
    fillet1_piece_7 = fillet1_piece_7a & fillet1_piece_7b
    add(fillet1_piece_7)
    with BuildSketch(Plane(origin=(-3, -15.4, 57.4), x_dir=(0, 1, 0), z_dir=(0, 0, 1))) as fillet1_piece_8a_section:
        with BuildLine():
            CenterArc((FILLET1_R, FILLET1_R), FILLET1_R, 180, 90)
            Line((0, FILLET1_R), (0, 0))
            Line((0, 0), (FILLET1_R, 0))
        make_face()
    fillet1_piece_8a = extrude(amount=13, mode=Mode.PRIVATE)
    fillet1_piece_8a = split(fillet1_piece_8a, bisect_by=Plane(origin=(-3.905580457, -14.494419543, 67.4), z_dir=(0, 0, -1)), keep=Keep.TOP, mode=Mode.PRIVATE)
    with BuildSketch(Plane(origin=(-3, -20.4, 67.4), x_dir=(0, 0, -1), z_dir=(0, 1, 0))) as fillet1_piece_8b_section:
        with BuildLine():
            CenterArc((FILLET1_R, FILLET1_R), FILLET1_R, 180, 90)
            Line((0, FILLET1_R), (0, 0))
            Line((0, 0), (FILLET1_R, 0))
        make_face()
    fillet1_piece_8b = extrude(amount=15, mode=Mode.PRIVATE)
    fillet1_piece_8b = split(fillet1_piece_8b, bisect_by=Plane(origin=(-3.905580457, -15.4, 66.494419543), z_dir=(0, 1, 0)), keep=Keep.TOP, mode=Mode.PRIVATE)
    fillet1_piece_8 = fillet1_piece_8a & fillet1_piece_8b
    add(fillet1_piece_8)

    # Sketch12 → Cut-Extrude5 (cut, through all)
    with BuildSketch(Plane(origin=(0, -40, 0), x_dir=(1, 0, 0), z_dir=(0, 1, 0))):
        with Locations((25.892423933, -6.026680472)):
            Rectangle(SKETCH12_W, SKETCH12_H)
        with Locations((25.266023287, -55.857541039)):
            Rectangle(SKETCH12_W_2, SKETCH12_H_2)
    extrude(amount=-CUT_EXTRUDE5_DEPTH, mode=Mode.SUBTRACT)

    # Sketch13 → Cut-Extrude8 (cut, through all)
    with BuildSketch(Plane.ZY.offset(-51.678578647)):
        with Locations((5.357325151, -21.442942739)):
            Rectangle(SKETCH13_W, SKETCH13_H)
        with Locations((56.905237557, -20.98749361)):
            Rectangle(SKETCH13_W_2, SKETCH13_H_2)
        with Locations((53.98636578, -260.284827018)):
            Rectangle(SKETCH13_W_3, SKETCH13_H_3)
    extrude(amount=-CUT_EXTRUDE8_DEPTH, mode=Mode.SUBTRACT)


solid = part.part
